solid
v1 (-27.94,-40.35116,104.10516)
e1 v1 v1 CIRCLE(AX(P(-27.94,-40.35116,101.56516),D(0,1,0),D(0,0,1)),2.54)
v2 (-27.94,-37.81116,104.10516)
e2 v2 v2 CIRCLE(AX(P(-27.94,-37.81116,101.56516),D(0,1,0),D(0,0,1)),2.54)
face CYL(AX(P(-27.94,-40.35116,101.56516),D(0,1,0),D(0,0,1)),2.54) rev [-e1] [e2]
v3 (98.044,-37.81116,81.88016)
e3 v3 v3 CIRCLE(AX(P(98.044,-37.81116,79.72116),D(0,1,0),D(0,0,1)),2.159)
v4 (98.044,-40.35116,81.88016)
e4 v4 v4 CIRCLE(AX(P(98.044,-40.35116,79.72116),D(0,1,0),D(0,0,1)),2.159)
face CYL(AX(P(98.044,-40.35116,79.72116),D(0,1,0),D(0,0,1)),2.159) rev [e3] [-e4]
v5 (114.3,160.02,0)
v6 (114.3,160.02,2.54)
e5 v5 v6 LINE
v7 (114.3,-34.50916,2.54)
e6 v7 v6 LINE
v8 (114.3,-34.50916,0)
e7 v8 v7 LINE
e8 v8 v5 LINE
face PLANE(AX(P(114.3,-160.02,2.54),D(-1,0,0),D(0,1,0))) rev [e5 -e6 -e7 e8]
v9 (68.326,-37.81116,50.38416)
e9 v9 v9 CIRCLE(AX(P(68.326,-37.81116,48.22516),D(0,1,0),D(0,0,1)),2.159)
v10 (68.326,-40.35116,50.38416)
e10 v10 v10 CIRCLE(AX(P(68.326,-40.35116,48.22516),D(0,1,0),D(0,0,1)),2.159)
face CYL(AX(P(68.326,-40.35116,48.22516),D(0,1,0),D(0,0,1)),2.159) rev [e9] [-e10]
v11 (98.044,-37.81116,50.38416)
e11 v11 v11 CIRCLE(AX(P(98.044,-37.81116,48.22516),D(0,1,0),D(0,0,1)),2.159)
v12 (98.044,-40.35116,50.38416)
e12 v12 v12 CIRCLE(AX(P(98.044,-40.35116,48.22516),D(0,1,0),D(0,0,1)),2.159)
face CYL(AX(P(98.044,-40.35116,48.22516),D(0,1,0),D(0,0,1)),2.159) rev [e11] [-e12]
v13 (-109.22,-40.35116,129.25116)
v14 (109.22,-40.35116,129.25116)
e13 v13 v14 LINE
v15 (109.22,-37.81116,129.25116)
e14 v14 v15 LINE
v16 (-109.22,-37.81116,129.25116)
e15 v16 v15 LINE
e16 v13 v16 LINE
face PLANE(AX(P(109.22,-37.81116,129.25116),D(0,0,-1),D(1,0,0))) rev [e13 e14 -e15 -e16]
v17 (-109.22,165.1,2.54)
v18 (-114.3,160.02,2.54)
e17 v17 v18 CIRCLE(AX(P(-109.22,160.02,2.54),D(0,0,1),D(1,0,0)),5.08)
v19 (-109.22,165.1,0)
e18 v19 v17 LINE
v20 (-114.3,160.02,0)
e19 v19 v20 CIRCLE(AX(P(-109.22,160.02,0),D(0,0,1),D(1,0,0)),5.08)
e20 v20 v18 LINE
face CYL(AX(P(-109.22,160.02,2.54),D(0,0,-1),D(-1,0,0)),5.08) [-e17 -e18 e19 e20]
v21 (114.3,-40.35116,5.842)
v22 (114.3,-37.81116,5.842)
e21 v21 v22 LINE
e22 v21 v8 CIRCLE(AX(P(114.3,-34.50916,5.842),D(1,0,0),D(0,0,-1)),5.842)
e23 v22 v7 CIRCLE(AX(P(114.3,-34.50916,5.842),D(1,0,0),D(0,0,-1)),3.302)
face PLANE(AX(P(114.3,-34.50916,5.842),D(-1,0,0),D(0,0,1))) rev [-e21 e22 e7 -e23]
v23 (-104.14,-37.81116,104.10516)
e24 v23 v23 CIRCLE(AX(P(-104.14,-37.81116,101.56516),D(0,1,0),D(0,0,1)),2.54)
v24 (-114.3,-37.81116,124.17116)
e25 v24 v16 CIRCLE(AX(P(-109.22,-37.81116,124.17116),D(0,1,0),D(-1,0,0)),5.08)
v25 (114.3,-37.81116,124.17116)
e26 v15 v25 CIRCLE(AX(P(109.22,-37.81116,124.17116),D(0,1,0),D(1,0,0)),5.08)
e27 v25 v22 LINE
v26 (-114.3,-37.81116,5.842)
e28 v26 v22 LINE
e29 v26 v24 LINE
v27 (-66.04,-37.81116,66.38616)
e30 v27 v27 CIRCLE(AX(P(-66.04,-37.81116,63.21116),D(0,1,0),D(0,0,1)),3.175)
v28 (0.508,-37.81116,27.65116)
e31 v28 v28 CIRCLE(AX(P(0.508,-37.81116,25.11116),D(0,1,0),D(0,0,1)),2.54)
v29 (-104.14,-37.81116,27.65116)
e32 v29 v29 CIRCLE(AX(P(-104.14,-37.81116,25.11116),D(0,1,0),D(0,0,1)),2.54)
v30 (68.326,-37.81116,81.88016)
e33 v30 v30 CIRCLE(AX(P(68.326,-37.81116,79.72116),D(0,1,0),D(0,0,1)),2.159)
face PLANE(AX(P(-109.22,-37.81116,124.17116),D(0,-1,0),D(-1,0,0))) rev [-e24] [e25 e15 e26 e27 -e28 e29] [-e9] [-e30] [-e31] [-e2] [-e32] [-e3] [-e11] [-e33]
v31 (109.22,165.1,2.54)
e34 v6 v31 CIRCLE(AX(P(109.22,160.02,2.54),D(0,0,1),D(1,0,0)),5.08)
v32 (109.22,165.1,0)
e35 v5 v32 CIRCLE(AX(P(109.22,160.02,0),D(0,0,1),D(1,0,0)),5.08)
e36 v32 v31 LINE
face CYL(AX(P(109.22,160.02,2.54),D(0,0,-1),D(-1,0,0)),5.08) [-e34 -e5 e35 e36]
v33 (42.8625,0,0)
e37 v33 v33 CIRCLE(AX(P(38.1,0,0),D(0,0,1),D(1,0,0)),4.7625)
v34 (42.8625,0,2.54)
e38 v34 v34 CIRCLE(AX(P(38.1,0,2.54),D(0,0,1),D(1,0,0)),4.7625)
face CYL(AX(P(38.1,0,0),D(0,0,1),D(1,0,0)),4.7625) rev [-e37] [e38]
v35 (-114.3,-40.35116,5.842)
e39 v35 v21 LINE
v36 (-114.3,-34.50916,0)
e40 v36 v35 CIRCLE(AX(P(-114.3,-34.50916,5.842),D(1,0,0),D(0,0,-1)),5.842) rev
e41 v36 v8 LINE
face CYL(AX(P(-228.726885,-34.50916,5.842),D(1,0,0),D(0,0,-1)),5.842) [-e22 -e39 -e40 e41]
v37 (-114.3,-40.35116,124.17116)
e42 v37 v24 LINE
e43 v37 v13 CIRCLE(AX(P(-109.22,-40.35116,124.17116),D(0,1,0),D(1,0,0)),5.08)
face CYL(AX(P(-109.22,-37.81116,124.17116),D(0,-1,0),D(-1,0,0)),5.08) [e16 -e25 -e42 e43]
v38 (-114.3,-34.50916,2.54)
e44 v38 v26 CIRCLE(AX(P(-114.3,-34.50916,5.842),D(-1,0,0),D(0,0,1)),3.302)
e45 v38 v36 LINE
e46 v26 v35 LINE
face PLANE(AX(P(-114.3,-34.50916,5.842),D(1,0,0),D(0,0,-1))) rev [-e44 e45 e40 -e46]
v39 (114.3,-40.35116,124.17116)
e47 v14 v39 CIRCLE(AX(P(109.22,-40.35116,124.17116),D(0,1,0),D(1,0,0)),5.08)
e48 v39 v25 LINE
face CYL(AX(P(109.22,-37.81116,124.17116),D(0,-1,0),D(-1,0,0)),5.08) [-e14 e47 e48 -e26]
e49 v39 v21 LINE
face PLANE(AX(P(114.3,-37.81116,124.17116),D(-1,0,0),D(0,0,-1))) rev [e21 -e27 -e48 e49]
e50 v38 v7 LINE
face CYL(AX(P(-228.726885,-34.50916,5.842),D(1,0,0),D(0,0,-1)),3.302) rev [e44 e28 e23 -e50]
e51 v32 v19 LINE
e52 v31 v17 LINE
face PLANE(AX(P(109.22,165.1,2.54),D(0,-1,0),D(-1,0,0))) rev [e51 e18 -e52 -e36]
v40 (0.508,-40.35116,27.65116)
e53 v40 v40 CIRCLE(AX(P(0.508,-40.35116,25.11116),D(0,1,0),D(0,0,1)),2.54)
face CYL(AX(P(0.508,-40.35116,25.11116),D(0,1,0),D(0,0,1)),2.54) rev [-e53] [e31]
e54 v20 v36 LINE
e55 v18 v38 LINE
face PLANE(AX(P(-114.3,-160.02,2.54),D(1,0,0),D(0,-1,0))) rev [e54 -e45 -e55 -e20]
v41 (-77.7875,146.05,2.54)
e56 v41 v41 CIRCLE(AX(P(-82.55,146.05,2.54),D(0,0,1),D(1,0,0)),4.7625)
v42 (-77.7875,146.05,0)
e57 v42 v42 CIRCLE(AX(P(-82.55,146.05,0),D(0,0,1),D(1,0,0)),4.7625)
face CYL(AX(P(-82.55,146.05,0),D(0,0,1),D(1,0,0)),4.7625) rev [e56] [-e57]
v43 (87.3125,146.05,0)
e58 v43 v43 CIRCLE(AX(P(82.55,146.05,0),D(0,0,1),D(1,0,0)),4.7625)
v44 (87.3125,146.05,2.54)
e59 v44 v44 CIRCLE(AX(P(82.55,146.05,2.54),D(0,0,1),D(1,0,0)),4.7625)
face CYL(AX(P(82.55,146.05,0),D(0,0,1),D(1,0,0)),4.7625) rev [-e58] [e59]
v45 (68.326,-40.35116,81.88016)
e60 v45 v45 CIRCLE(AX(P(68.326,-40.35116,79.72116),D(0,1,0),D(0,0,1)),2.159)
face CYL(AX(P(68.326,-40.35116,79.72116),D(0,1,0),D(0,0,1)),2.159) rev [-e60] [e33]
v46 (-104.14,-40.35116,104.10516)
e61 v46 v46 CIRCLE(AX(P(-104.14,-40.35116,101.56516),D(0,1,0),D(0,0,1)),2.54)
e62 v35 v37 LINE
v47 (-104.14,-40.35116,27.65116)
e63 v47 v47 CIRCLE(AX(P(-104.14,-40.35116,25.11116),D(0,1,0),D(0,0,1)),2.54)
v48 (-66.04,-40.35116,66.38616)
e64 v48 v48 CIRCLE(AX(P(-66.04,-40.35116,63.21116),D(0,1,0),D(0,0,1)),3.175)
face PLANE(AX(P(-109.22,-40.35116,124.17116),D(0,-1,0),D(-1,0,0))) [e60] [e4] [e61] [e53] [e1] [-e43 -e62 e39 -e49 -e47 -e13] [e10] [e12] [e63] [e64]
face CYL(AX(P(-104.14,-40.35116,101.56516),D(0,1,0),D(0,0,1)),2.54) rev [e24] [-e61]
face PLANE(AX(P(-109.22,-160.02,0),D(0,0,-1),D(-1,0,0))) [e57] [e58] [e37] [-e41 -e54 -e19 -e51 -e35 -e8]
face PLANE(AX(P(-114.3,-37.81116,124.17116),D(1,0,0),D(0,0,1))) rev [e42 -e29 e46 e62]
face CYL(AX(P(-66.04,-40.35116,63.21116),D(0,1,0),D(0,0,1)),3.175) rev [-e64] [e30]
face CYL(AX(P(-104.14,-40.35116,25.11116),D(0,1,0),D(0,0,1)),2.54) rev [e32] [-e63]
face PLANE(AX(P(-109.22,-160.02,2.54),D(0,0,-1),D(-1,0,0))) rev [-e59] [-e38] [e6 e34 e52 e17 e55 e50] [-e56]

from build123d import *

# Parameters (mm, degrees)
BOSS_EXTRUDE1_DEPTH      = 2.54
SKETCHED_START           = -165.1
SKETCHED_BEND1_OUTLINE_W = 228.6
SKETCHED_BEND1_OUTLINE_H = 2.54
SKETCHED_BEND1_DEPTH     = 125.300208363
SKETCHED_START_2         = -40.351159597
SKETCHED_BEND1_2_DEPTH   = 4.05656796
SKETCHED_START_3         = -114.3
SKETCHED_BEND1_3_DEPTH   = 228.6
SKETCHED_BEND1_4_DEPTH   = 228.6
SKETCH8_R                = 2.54
SKETCH8_R_2              = 3.175
SKETCH8_R_3              = 2.159
CUT_EXTRUDE2_DEPTH       = 2.54
SKETCH29_R               = 4.7625
CUT_EXTRUDE3_DEPTH       = 2.54


with BuildPart() as part:
    # Sketch2 → Boss-Extrude1 (new body)
    with BuildSketch(Plane.XY):
        with BuildLine():
            Line((109.22, -165.1), (-109.22, -165.1))
            ThreePointArc((-109.22, -165.1), (-112.812102448, -163.612102448), (-114.3, -160.02))
            Line((-114.3, -160.02), (-114.3, 160.02))
            ThreePointArc((-114.3, 160.02), (-112.812102448, 163.612102448), (-109.22, 165.1))
            Line((-109.22, 165.1), (109.22, 165.1))
            ThreePointArc((109.22, 165.1), (112.812102448, 163.612102448), (114.3, 160.02))
            Line((114.3, 160.02), (114.3, -160.02))
            ThreePointArc((114.3, -160.02), (112.812102448, -163.612102448), (109.22, -165.1))
        make_face()
    extrude(amount=BOSS_EXTRUDE1_DEPTH)

    # Sketched Bend1: read off the stored shape, not the designer's step
    # Sketched Bend1 outline → Sketched Bend1 (cut)
    with BuildSketch(Plane(origin=(0, 0, 0), x_dir=(1, 0, 0), z_dir=(0, 1, 0)).offset(SKETCHED_START)):
        with Locations((0, -1.27)):
            Rectangle(SKETCHED_BEND1_OUTLINE_W, SKETCHED_BEND1_OUTLINE_H)
    extrude(amount=SKETCHED_BEND1_DEPTH, mode=Mode.SUBTRACT)

    # Sketched Bend1 2 outline → Sketched Bend1 2 (add)
    with BuildSketch(Plane(origin=(0, 0, 0), x_dir=(1, 0, 0), z_dir=(0, 1, 0)).offset(SKETCHED_START_2)):
        with BuildLine():
            Line((114.3, -124.171159597), (114.3, -2.54))
            Line((114.3, -2.54), (-114.3, -2.54))
            Line((-114.3, -2.54), (-114.3, -124.171159597))
            ThreePointArc((-114.3, -124.171159597), (-112.812102448, -127.763262045), (-109.22, -129.251159597))
            Line((-109.22, -129.251159597), (109.22, -129.251159597))
            ThreePointArc((109.22, -129.251159597), (112.812102448, -127.763262045), (114.3, -124.171159597))
        make_face()
    extrude(amount=SKETCHED_BEND1_2_DEPTH)

    # Sketched Bend1 3 outline → Sketched Bend1 3 (cut)
    with BuildSketch(Plane.YZ.offset(SKETCHED_START_3)):
        with BuildLine():
            Line((-36.294591637, 129.251159597), (-37.811159597, 129.251159597))
            Line((-37.811159597, 129.251159597), (-37.811159597, 5.842))
            ThreePointArc((-37.811159597, 5.842), (-37.407322859, 4.259642992), (-36.294591637, 3.064332557))
            Line((-36.294591637, 3.064332557), (-36.294591637, 129.251159597))
        make_face()
        with BuildLine():
            ThreePointArc((-34.509159597, 0), (-38.640077413, 1.711082184), (-40.351159597, 5.842))
            Line((-40.351159597, 5.842), (-40.351159597, 2.54))
            Line((-40.351159597, 2.54), (-39.799791637, 2.54))
            Line((-39.799791637, 2.54), (-39.799791637, 0))
            Line((-39.799791637, 0), (-34.509159597, 0))
        make_face()
    extrude(amount=SKETCHED_BEND1_3_DEPTH, mode=Mode.SUBTRACT)

    # Sketched Bend1 4 outline → Sketched Bend1 4 (add)
    with BuildSketch(Plane.YZ.offset(SKETCHED_START_3)):
        with BuildLine():
            ThreePointArc((-34.509159597, 2.54), (-35.439575122, 2.673793733), (-36.294591637, 3.064332557))
            Line((-36.294591637, 3.064332557), (-36.294591637, 2.54))
            Line((-36.294591637, 2.54), (-34.509159597, 2.54))
        make_face()
    extrude(amount=SKETCHED_BEND1_4_DEPTH)

    # Sketch8 → Cut-Extrude2 (cut)
    with BuildSketch(Plane(origin=(0, -37.811159597, 0), x_dir=(1, 0, 0), z_dir=(0, 1, 0))):
        with Locations(Location((-104.14, -25.111159597, 0), (0, 0, 270))):
            Circle(SKETCH8_R)
        with Locations(Location((0.508, -25.111159597, 0), (0, 0, 270))):
            Circle(SKETCH8_R)
        with Locations(Location((-104.14, -101.565159597, 0), (0, 0, 270))):
            Circle(SKETCH8_R)
        with Locations(Location((-27.94, -101.565159597, 0), (0, 0, 270))):
            Circle(SKETCH8_R)
        with Locations(Location((-66.04, -63.211159597, 0), (0, 0, 270))):
            Circle(SKETCH8_R_2)
        with Locations(Location((68.326, -48.225159597, 0), (0, 0, 270))):
            Circle(SKETCH8_R_3)
        with Locations(Location((98.044, -48.225159597, 0), (0, 0, 270))):
            Circle(SKETCH8_R_3)
        with Locations(Location((98.044, -79.721159597, 0), (0, 0, 270))):
            Circle(SKETCH8_R_3)
        with Locations(Location((68.326, -79.721159597, 0), (0, 0, 270))):
            Circle(SKETCH8_R_3)
    extrude(amount=-CUT_EXTRUDE2_DEPTH, mode=Mode.SUBTRACT)

    # Sketch29 → Cut-Extrude3 (cut)
    with BuildSketch(Plane.XY.offset(2.54)):
        with Locations((-82.55, 146.05)):
            Circle(SKETCH29_R)
        with Locations((82.55, 146.05)):
            Circle(SKETCH29_R)
        with Locations((38.1, 0)):
            Circle(SKETCH29_R)
    extrude(amount=-CUT_EXTRUDE3_DEPTH, mode=Mode.SUBTRACT)


solid = part.part
